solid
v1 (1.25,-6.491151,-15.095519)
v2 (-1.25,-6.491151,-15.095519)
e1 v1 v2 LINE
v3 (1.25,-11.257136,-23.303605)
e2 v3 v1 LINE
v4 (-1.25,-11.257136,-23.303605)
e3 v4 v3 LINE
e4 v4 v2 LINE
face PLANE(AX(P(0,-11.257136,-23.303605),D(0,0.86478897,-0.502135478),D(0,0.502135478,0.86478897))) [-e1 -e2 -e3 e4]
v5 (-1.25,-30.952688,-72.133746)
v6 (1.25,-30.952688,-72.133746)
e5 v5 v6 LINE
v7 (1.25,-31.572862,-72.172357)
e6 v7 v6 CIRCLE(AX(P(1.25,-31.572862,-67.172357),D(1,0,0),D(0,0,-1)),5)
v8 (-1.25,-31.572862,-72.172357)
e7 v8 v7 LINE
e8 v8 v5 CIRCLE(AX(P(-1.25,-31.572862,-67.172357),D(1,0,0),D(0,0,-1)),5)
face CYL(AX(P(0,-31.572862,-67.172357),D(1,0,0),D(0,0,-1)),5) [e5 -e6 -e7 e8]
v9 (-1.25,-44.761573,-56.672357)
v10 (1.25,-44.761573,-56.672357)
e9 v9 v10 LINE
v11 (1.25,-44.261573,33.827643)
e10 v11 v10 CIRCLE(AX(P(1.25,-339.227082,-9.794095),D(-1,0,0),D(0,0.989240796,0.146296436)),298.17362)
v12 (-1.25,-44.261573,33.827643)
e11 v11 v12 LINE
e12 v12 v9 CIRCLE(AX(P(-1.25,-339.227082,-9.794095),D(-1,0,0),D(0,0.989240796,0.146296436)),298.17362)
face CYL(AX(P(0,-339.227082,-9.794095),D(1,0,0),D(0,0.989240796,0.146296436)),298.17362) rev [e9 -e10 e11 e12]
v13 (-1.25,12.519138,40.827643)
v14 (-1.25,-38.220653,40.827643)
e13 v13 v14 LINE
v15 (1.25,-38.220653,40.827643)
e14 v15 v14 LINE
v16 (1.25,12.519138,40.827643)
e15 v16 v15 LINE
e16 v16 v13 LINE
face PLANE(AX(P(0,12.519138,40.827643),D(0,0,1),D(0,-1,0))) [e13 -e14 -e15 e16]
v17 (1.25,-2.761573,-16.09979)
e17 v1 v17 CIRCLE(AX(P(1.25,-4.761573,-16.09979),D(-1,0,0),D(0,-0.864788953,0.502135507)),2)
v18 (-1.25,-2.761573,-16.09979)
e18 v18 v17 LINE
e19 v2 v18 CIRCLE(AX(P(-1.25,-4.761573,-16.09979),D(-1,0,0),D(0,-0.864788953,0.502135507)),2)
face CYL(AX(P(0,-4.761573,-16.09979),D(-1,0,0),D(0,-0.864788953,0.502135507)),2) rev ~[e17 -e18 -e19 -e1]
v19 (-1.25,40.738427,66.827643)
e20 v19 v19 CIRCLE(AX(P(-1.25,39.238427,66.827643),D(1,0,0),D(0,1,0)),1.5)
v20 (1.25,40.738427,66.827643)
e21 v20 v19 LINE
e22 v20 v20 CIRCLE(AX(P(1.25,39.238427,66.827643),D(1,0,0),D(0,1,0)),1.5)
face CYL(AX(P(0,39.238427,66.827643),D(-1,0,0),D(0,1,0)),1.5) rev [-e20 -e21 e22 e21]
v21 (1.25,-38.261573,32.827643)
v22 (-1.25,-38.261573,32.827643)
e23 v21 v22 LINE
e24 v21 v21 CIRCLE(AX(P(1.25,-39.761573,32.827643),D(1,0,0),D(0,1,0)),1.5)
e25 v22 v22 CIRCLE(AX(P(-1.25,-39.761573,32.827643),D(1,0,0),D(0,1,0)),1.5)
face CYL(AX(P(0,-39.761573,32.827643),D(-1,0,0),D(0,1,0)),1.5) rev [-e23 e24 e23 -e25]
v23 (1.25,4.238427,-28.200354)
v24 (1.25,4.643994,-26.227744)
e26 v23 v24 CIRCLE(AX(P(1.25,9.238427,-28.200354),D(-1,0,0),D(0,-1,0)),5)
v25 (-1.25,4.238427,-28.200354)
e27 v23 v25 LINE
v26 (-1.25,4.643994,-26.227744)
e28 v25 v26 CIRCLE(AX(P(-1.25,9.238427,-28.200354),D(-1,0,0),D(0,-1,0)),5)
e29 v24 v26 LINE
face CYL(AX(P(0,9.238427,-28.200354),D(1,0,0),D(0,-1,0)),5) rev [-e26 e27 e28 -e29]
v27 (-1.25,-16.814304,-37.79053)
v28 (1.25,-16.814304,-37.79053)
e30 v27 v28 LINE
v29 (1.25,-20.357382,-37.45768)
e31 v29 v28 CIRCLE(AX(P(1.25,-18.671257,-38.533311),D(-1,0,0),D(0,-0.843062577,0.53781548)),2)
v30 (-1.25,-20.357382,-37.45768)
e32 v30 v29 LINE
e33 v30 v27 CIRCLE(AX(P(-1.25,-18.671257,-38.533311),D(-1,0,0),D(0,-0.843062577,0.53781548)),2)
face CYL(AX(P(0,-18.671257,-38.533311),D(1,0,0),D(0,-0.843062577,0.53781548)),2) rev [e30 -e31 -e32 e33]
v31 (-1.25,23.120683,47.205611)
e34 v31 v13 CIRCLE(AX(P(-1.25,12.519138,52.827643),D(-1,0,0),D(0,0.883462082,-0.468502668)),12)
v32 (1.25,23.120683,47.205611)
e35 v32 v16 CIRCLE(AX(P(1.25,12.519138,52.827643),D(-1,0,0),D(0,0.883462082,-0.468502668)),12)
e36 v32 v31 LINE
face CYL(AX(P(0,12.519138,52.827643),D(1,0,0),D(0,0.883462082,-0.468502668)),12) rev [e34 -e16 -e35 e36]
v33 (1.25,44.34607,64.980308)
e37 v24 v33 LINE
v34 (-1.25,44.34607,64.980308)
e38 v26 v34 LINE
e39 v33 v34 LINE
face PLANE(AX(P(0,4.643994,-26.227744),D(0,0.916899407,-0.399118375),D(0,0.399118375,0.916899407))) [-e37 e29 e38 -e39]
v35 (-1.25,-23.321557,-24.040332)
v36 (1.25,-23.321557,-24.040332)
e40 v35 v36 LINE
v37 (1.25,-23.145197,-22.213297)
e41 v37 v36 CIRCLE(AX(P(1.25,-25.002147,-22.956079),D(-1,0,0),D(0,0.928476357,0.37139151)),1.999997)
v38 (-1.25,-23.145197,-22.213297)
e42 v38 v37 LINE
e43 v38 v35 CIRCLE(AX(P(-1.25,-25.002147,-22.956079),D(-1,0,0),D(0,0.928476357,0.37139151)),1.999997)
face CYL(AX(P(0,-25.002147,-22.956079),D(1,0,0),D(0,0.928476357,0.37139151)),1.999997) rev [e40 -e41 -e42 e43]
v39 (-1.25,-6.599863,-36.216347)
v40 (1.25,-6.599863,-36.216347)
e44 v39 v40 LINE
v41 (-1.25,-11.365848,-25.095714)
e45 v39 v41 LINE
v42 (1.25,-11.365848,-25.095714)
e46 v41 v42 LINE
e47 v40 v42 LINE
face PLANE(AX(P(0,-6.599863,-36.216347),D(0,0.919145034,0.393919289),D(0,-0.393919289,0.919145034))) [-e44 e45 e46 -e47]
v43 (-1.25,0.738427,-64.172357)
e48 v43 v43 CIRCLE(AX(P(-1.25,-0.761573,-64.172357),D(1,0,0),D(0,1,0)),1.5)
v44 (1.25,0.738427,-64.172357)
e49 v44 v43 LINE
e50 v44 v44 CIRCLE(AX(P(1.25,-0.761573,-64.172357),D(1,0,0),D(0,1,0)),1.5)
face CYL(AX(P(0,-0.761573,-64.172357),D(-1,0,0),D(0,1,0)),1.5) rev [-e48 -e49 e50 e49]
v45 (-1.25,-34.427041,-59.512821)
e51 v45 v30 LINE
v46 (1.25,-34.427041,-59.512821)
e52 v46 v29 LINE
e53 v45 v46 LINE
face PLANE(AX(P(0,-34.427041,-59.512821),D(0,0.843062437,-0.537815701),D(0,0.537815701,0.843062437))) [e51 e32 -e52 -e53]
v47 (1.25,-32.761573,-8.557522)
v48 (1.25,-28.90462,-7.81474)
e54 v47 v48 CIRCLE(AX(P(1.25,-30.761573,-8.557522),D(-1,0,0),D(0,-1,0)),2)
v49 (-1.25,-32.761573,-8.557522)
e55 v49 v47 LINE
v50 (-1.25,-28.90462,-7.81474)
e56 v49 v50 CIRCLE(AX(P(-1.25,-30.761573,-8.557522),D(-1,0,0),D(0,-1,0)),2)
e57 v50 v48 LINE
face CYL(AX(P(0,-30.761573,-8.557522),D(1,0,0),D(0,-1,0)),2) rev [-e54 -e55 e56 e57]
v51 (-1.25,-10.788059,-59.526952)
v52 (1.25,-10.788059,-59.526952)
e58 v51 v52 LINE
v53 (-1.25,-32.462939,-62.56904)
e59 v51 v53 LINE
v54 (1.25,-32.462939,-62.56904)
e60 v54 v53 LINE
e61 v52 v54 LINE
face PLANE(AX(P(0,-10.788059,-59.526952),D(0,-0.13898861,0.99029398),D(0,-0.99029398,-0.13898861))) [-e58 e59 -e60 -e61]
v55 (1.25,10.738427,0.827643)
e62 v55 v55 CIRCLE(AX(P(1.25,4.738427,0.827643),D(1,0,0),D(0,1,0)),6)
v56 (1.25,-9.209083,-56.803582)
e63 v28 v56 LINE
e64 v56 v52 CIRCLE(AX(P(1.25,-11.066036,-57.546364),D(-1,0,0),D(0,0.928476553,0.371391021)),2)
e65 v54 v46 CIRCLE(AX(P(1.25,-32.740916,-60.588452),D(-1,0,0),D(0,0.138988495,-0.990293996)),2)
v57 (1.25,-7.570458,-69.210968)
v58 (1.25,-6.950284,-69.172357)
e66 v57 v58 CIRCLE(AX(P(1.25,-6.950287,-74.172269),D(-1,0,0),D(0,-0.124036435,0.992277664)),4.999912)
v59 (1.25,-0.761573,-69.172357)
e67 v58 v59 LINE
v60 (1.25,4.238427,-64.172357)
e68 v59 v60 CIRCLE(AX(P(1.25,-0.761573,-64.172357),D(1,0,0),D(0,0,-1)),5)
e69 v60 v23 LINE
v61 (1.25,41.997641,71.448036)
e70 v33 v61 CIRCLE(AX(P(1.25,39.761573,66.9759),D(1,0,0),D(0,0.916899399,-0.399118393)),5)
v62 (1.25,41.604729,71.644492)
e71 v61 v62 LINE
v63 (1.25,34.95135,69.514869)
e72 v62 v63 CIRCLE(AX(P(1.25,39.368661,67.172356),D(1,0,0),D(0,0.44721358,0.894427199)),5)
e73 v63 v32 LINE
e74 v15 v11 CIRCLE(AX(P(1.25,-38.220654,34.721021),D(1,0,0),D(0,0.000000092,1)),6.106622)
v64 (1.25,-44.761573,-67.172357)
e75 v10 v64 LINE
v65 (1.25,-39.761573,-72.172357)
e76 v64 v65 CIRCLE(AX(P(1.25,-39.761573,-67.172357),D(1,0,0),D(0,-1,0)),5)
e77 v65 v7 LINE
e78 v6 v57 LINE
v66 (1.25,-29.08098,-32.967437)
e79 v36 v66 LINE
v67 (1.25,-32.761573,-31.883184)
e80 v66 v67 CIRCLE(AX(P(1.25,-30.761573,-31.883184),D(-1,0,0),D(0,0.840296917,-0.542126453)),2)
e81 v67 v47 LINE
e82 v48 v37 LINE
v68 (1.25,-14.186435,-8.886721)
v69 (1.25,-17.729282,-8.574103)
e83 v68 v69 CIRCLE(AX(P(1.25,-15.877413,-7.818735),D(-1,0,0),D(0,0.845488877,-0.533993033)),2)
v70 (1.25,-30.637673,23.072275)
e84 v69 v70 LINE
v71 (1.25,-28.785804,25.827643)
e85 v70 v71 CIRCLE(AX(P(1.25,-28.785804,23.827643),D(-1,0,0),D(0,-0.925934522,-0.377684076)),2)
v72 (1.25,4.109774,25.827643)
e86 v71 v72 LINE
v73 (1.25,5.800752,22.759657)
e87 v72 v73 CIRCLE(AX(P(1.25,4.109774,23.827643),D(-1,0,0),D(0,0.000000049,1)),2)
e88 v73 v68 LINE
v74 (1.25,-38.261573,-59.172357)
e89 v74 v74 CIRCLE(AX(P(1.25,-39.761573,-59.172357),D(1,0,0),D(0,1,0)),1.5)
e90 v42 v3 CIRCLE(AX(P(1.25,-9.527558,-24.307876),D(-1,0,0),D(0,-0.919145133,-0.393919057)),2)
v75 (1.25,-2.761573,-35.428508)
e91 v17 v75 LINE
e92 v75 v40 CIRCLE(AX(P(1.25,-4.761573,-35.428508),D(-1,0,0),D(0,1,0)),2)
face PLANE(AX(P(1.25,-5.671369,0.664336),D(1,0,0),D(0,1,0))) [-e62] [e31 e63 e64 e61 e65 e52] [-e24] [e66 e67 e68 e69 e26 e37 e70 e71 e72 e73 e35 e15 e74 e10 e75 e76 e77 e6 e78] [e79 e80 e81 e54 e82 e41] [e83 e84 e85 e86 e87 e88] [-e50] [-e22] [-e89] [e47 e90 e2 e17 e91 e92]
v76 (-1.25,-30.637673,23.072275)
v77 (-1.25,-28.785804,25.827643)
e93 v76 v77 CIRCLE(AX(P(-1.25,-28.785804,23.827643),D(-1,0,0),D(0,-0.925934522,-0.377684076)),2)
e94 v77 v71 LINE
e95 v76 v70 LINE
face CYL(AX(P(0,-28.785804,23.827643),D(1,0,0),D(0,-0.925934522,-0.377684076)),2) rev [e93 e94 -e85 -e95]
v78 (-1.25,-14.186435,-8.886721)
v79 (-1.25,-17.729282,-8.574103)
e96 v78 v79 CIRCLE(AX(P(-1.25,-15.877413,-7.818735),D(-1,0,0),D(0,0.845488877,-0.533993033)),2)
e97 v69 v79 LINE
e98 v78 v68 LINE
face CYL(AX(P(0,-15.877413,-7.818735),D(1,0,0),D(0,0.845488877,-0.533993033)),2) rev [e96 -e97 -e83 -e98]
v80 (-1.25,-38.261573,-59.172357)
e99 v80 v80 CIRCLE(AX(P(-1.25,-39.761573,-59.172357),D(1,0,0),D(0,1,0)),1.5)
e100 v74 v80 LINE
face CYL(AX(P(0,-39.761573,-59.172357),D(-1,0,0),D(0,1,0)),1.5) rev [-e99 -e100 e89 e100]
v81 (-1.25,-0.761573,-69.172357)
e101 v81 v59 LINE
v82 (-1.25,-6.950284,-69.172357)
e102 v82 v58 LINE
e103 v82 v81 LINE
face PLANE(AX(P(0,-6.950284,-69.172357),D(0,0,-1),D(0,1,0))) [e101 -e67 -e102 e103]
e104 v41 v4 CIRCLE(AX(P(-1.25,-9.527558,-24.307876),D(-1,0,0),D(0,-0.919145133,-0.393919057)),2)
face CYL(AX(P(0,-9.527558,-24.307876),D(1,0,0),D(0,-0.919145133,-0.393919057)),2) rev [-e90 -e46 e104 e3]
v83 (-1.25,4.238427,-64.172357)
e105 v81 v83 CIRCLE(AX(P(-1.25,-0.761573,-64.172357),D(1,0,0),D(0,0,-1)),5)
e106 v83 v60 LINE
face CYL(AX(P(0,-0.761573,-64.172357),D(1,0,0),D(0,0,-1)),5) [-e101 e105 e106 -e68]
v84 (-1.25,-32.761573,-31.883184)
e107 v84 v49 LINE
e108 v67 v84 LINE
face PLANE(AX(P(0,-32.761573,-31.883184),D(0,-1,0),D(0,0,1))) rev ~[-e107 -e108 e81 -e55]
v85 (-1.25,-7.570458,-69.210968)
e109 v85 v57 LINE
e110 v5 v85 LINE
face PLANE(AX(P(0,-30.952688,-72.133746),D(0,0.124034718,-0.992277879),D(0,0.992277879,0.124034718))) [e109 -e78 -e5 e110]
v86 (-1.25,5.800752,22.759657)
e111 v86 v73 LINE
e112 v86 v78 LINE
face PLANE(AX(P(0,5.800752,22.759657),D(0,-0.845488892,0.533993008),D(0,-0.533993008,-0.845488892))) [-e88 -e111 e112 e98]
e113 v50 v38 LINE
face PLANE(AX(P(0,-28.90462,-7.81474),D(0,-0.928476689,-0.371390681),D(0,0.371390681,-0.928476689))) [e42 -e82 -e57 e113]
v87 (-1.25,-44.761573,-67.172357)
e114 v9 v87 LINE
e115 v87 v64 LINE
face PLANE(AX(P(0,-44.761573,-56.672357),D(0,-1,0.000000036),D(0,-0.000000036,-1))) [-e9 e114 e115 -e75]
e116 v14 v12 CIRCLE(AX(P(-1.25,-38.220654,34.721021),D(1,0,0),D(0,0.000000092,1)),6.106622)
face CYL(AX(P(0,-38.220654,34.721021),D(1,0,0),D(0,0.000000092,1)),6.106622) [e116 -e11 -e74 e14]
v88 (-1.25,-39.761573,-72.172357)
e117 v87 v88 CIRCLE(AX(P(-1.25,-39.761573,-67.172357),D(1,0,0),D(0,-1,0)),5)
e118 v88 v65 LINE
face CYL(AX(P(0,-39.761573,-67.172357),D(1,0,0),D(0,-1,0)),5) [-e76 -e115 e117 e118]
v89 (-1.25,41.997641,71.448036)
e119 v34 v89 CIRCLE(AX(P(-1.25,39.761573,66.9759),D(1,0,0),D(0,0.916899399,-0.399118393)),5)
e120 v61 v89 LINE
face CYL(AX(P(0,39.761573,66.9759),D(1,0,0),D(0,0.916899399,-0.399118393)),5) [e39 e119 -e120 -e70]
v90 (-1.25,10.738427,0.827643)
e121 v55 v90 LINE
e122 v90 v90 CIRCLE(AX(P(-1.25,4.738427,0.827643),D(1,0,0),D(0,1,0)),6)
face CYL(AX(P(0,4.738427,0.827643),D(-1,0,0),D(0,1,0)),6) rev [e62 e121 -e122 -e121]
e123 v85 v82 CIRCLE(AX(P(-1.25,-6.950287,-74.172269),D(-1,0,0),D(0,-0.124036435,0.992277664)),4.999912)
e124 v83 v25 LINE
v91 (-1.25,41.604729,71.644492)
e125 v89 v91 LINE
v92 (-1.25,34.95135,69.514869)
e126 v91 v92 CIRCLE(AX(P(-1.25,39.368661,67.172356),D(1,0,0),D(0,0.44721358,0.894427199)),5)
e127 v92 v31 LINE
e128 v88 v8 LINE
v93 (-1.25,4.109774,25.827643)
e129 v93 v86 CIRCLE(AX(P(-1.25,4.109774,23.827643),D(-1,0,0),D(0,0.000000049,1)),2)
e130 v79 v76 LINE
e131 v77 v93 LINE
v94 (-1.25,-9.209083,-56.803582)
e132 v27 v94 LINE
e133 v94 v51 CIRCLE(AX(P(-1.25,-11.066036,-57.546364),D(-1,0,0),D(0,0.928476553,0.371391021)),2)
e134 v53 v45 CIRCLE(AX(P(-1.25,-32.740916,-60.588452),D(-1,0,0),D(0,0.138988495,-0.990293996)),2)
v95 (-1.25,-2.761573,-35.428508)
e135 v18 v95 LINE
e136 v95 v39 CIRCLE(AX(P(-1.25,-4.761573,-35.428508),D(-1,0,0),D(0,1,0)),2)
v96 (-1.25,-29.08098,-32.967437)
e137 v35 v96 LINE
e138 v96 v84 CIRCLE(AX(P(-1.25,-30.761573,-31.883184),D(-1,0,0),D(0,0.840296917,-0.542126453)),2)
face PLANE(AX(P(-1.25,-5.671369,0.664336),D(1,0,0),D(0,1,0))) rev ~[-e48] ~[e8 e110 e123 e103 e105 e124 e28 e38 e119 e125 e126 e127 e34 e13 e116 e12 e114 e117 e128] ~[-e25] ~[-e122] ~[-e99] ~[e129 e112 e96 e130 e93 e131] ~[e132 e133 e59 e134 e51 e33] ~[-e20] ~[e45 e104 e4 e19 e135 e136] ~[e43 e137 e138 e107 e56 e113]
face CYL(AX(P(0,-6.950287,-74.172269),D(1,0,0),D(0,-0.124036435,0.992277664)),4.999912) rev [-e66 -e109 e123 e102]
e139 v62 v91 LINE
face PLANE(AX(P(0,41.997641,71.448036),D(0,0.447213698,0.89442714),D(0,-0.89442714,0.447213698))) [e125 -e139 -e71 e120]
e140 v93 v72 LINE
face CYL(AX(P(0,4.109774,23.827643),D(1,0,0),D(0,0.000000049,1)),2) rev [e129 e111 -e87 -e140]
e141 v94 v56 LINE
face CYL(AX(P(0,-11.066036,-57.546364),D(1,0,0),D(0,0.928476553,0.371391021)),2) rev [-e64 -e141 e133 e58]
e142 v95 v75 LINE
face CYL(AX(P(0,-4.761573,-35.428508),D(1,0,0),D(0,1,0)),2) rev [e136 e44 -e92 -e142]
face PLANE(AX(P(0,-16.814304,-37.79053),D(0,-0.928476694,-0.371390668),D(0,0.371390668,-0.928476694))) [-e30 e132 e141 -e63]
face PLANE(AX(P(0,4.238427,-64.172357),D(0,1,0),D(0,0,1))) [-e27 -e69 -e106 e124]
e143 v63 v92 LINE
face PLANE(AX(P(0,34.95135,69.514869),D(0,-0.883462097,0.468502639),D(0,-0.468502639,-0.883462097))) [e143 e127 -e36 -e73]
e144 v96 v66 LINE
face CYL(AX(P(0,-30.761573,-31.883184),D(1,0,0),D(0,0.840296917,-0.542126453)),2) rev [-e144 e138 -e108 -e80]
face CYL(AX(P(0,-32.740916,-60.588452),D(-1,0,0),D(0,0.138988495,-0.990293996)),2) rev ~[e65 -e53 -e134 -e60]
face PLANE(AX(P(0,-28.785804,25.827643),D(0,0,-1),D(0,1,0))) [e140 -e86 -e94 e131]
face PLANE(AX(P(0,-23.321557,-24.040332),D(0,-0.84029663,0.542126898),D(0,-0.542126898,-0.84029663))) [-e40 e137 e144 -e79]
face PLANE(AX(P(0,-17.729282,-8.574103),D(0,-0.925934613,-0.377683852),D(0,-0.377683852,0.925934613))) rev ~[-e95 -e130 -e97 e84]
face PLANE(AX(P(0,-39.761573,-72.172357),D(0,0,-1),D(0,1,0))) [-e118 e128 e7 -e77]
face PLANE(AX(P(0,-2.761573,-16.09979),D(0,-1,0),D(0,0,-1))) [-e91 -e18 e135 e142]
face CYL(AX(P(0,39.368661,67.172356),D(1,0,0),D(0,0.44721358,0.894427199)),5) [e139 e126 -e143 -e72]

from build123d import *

# Parameters (mm, degrees)
F0_R     = 1.5
F0_R_2   = 6
F1_DEPTH = 1.25


# Not quite as in the source:
# - ends of sketch curves that miss each other by under 0.0002 mm in the source are joined


with BuildPart() as f1:
    # F0 (on Right) → F1 (new body, symmetric)
    with BuildSketch(Plane.YZ):
        with BuildLine():
            ThreePointArc((-44.2615727709, 33.8276430339), (-41.0580126337, -11.4414374496), (-44.7615726272, -56.6723570594))
            Line((-44.7615726272, -56.6723570594), (-44.761573, -67.172357))
            ThreePointArc((-44.761573, -67.172357), (-43.2971069059, -70.7078909059), (-39.761573, -72.172357))
            Line((-39.761573, -72.172357), (-31.572862, -72.172357))
            ThreePointArc((-31.572862, -72.172357), (-31.2621746065, -72.1626949989), (-30.9526879578, -72.1337463374))
            Line((-30.9526879578, -72.1337463374), (-7.570458, -69.210968))
            ThreePointArc((-7.570458, -69.210968), (-7.2609713935, -69.1820190011), (-6.950284, -69.172357))
            Line((-6.950284, -69.172357), (-0.761573, -69.172357))
            ThreePointArc((-0.761573, -69.172357), (2.7739609059, -67.7078909059), (4.238427, -64.172357))
            Line((4.238427, -64.172357), (4.238427, -28.200354))
            ThreePointArc((4.238427, -28.200354), (4.340868282, -27.1934187471), (4.6439944414, -26.2277441895))
            Line((4.6439944414, -26.2277441895), (44.34607, 64.980308))
            ThreePointArc((44.34607, 64.980308), (44.4613498885, 68.6823868), (41.9976409775, 71.448035955))
            Line((41.9976409775, 71.448035955), (41.604729, 71.644492))
            ThreePointArc((41.604729, 71.644492), (37.8444305073, 71.9343641274), (34.9513503203, 69.5148688301))
            Line((34.9513503203, 69.5148688301), (23.120683, 47.205611))
            ThreePointArc((23.120683, 47.205611), (18.7052359642, 42.5450269916), (12.519138, 40.827643))
            Line((12.519138, 40.827643), (-38.220653, 40.827643))
            ThreePointArc((-38.220653, 40.827643), (-42.8437667533, 38.710714686), (-44.2615727709, 33.8276430339))
        make_face()
        with Locations((-39.761573, -59.172357)):
            Circle(F0_R, mode=Mode.SUBTRACT)
        with Locations((-0.761573, -64.172357)):
            Circle(F0_R, mode=Mode.SUBTRACT)
        with BuildLine():
            ThreePointArc((-9.2090828941, -56.8035819576), (-9.3358141293, -58.5495251427), (-10.7880590013, -59.5269519905))
            Line((-10.7880590013, -59.5269519905), (-32.462939, -62.56904))
            ThreePointArc((-32.462939, -62.56904), (-34.4234257272, -61.6697294934), (-34.4270410919, -59.5128209413))
            Line((-34.4270410919, -59.5128209413), (-20.357382, -37.45768))
            ThreePointArc((-20.357382, -37.45768), (-18.4841932611, -36.5420784276), (-16.8143035493, -37.7905298197))
            Line((-16.8143035493, -37.7905298197), (-9.2090828941, -56.8035819576))
        make_face(mode=Mode.SUBTRACT)
        with BuildLine():
            Line((-23.321557, -24.040332), (-29.08098, -32.967437))
            ThreePointArc((-29.08098, -32.967437), (-31.3267335557, -33.8016713068), (-32.761573, -31.883184))
            Line((-32.761573, -31.883184), (-32.761573, -8.557522))
            ThreePointArc((-32.761573, -8.557522), (-31.139788407, -6.5936092968), (-28.9046198941, -7.8147399576))
            Line((-28.9046198941, -7.8147399576), (-23.145197, -22.213297))
            ThreePointArc((-23.145197, -22.213297), (-23.0114029888, -23.1482412686), (-23.321557, -24.040332))
        make_face(mode=Mode.SUBTRACT)
        with BuildLine():
            ThreePointArc((-11.3658482669, -25.0957141144), (-11.5238882865, -24.1867752684), (-11.2571359352, -23.3036050376))
            Line((-11.2571359352, -23.3036050376), (-6.491151, -15.095519))
            ThreePointArc((-6.491151, -15.095519), (-4.2415517843, -14.1685784799), (-2.761573, -16.09979))
            Line((-2.761573, -16.09979), (-2.761573, -35.428508))
            ThreePointArc((-2.761573, -35.428508), (-4.3594410625, -37.387663406), (-6.5998629049, -36.2163469592))
            Line((-6.5998629049, -36.2163469592), (-11.3658482669, -25.0957141144))
        make_face(mode=Mode.SUBTRACT)
        with Locations((-39.761573, 32.827643)):
            Circle(F0_R, mode=Mode.SUBTRACT)
        with BuildLine():
            Line((5.800752, 22.759657), (-14.186435, -8.886721))
            ThreePointArc((-14.186435, -8.886721), (-16.0532082809, -9.8109940241), (-17.7292820906, -8.574103037))
            Line((-17.7292820906, -8.574103037), (-30.637673, 23.072275))
            ThreePointArc((-30.637673, 23.072275), (-30.4457341301, 24.9432737467), (-28.785804, 25.827643))
            Line((-28.785804, 25.827643), (4.109774, 25.827643))
            ThreePointArc((4.109774, 25.827643), (5.8613407009, 24.7930517696), (5.800752, 22.759657))
        make_face(mode=Mode.SUBTRACT)
        with Locations((4.738427, 0.827643)):
            Circle(F0_R_2, mode=Mode.SUBTRACT)
        with Locations((39.238427, 66.827643)):
            Circle(F0_R, mode=Mode.SUBTRACT)
    extrude(amount=F1_DEPTH, both=True)


solid = f1.part
